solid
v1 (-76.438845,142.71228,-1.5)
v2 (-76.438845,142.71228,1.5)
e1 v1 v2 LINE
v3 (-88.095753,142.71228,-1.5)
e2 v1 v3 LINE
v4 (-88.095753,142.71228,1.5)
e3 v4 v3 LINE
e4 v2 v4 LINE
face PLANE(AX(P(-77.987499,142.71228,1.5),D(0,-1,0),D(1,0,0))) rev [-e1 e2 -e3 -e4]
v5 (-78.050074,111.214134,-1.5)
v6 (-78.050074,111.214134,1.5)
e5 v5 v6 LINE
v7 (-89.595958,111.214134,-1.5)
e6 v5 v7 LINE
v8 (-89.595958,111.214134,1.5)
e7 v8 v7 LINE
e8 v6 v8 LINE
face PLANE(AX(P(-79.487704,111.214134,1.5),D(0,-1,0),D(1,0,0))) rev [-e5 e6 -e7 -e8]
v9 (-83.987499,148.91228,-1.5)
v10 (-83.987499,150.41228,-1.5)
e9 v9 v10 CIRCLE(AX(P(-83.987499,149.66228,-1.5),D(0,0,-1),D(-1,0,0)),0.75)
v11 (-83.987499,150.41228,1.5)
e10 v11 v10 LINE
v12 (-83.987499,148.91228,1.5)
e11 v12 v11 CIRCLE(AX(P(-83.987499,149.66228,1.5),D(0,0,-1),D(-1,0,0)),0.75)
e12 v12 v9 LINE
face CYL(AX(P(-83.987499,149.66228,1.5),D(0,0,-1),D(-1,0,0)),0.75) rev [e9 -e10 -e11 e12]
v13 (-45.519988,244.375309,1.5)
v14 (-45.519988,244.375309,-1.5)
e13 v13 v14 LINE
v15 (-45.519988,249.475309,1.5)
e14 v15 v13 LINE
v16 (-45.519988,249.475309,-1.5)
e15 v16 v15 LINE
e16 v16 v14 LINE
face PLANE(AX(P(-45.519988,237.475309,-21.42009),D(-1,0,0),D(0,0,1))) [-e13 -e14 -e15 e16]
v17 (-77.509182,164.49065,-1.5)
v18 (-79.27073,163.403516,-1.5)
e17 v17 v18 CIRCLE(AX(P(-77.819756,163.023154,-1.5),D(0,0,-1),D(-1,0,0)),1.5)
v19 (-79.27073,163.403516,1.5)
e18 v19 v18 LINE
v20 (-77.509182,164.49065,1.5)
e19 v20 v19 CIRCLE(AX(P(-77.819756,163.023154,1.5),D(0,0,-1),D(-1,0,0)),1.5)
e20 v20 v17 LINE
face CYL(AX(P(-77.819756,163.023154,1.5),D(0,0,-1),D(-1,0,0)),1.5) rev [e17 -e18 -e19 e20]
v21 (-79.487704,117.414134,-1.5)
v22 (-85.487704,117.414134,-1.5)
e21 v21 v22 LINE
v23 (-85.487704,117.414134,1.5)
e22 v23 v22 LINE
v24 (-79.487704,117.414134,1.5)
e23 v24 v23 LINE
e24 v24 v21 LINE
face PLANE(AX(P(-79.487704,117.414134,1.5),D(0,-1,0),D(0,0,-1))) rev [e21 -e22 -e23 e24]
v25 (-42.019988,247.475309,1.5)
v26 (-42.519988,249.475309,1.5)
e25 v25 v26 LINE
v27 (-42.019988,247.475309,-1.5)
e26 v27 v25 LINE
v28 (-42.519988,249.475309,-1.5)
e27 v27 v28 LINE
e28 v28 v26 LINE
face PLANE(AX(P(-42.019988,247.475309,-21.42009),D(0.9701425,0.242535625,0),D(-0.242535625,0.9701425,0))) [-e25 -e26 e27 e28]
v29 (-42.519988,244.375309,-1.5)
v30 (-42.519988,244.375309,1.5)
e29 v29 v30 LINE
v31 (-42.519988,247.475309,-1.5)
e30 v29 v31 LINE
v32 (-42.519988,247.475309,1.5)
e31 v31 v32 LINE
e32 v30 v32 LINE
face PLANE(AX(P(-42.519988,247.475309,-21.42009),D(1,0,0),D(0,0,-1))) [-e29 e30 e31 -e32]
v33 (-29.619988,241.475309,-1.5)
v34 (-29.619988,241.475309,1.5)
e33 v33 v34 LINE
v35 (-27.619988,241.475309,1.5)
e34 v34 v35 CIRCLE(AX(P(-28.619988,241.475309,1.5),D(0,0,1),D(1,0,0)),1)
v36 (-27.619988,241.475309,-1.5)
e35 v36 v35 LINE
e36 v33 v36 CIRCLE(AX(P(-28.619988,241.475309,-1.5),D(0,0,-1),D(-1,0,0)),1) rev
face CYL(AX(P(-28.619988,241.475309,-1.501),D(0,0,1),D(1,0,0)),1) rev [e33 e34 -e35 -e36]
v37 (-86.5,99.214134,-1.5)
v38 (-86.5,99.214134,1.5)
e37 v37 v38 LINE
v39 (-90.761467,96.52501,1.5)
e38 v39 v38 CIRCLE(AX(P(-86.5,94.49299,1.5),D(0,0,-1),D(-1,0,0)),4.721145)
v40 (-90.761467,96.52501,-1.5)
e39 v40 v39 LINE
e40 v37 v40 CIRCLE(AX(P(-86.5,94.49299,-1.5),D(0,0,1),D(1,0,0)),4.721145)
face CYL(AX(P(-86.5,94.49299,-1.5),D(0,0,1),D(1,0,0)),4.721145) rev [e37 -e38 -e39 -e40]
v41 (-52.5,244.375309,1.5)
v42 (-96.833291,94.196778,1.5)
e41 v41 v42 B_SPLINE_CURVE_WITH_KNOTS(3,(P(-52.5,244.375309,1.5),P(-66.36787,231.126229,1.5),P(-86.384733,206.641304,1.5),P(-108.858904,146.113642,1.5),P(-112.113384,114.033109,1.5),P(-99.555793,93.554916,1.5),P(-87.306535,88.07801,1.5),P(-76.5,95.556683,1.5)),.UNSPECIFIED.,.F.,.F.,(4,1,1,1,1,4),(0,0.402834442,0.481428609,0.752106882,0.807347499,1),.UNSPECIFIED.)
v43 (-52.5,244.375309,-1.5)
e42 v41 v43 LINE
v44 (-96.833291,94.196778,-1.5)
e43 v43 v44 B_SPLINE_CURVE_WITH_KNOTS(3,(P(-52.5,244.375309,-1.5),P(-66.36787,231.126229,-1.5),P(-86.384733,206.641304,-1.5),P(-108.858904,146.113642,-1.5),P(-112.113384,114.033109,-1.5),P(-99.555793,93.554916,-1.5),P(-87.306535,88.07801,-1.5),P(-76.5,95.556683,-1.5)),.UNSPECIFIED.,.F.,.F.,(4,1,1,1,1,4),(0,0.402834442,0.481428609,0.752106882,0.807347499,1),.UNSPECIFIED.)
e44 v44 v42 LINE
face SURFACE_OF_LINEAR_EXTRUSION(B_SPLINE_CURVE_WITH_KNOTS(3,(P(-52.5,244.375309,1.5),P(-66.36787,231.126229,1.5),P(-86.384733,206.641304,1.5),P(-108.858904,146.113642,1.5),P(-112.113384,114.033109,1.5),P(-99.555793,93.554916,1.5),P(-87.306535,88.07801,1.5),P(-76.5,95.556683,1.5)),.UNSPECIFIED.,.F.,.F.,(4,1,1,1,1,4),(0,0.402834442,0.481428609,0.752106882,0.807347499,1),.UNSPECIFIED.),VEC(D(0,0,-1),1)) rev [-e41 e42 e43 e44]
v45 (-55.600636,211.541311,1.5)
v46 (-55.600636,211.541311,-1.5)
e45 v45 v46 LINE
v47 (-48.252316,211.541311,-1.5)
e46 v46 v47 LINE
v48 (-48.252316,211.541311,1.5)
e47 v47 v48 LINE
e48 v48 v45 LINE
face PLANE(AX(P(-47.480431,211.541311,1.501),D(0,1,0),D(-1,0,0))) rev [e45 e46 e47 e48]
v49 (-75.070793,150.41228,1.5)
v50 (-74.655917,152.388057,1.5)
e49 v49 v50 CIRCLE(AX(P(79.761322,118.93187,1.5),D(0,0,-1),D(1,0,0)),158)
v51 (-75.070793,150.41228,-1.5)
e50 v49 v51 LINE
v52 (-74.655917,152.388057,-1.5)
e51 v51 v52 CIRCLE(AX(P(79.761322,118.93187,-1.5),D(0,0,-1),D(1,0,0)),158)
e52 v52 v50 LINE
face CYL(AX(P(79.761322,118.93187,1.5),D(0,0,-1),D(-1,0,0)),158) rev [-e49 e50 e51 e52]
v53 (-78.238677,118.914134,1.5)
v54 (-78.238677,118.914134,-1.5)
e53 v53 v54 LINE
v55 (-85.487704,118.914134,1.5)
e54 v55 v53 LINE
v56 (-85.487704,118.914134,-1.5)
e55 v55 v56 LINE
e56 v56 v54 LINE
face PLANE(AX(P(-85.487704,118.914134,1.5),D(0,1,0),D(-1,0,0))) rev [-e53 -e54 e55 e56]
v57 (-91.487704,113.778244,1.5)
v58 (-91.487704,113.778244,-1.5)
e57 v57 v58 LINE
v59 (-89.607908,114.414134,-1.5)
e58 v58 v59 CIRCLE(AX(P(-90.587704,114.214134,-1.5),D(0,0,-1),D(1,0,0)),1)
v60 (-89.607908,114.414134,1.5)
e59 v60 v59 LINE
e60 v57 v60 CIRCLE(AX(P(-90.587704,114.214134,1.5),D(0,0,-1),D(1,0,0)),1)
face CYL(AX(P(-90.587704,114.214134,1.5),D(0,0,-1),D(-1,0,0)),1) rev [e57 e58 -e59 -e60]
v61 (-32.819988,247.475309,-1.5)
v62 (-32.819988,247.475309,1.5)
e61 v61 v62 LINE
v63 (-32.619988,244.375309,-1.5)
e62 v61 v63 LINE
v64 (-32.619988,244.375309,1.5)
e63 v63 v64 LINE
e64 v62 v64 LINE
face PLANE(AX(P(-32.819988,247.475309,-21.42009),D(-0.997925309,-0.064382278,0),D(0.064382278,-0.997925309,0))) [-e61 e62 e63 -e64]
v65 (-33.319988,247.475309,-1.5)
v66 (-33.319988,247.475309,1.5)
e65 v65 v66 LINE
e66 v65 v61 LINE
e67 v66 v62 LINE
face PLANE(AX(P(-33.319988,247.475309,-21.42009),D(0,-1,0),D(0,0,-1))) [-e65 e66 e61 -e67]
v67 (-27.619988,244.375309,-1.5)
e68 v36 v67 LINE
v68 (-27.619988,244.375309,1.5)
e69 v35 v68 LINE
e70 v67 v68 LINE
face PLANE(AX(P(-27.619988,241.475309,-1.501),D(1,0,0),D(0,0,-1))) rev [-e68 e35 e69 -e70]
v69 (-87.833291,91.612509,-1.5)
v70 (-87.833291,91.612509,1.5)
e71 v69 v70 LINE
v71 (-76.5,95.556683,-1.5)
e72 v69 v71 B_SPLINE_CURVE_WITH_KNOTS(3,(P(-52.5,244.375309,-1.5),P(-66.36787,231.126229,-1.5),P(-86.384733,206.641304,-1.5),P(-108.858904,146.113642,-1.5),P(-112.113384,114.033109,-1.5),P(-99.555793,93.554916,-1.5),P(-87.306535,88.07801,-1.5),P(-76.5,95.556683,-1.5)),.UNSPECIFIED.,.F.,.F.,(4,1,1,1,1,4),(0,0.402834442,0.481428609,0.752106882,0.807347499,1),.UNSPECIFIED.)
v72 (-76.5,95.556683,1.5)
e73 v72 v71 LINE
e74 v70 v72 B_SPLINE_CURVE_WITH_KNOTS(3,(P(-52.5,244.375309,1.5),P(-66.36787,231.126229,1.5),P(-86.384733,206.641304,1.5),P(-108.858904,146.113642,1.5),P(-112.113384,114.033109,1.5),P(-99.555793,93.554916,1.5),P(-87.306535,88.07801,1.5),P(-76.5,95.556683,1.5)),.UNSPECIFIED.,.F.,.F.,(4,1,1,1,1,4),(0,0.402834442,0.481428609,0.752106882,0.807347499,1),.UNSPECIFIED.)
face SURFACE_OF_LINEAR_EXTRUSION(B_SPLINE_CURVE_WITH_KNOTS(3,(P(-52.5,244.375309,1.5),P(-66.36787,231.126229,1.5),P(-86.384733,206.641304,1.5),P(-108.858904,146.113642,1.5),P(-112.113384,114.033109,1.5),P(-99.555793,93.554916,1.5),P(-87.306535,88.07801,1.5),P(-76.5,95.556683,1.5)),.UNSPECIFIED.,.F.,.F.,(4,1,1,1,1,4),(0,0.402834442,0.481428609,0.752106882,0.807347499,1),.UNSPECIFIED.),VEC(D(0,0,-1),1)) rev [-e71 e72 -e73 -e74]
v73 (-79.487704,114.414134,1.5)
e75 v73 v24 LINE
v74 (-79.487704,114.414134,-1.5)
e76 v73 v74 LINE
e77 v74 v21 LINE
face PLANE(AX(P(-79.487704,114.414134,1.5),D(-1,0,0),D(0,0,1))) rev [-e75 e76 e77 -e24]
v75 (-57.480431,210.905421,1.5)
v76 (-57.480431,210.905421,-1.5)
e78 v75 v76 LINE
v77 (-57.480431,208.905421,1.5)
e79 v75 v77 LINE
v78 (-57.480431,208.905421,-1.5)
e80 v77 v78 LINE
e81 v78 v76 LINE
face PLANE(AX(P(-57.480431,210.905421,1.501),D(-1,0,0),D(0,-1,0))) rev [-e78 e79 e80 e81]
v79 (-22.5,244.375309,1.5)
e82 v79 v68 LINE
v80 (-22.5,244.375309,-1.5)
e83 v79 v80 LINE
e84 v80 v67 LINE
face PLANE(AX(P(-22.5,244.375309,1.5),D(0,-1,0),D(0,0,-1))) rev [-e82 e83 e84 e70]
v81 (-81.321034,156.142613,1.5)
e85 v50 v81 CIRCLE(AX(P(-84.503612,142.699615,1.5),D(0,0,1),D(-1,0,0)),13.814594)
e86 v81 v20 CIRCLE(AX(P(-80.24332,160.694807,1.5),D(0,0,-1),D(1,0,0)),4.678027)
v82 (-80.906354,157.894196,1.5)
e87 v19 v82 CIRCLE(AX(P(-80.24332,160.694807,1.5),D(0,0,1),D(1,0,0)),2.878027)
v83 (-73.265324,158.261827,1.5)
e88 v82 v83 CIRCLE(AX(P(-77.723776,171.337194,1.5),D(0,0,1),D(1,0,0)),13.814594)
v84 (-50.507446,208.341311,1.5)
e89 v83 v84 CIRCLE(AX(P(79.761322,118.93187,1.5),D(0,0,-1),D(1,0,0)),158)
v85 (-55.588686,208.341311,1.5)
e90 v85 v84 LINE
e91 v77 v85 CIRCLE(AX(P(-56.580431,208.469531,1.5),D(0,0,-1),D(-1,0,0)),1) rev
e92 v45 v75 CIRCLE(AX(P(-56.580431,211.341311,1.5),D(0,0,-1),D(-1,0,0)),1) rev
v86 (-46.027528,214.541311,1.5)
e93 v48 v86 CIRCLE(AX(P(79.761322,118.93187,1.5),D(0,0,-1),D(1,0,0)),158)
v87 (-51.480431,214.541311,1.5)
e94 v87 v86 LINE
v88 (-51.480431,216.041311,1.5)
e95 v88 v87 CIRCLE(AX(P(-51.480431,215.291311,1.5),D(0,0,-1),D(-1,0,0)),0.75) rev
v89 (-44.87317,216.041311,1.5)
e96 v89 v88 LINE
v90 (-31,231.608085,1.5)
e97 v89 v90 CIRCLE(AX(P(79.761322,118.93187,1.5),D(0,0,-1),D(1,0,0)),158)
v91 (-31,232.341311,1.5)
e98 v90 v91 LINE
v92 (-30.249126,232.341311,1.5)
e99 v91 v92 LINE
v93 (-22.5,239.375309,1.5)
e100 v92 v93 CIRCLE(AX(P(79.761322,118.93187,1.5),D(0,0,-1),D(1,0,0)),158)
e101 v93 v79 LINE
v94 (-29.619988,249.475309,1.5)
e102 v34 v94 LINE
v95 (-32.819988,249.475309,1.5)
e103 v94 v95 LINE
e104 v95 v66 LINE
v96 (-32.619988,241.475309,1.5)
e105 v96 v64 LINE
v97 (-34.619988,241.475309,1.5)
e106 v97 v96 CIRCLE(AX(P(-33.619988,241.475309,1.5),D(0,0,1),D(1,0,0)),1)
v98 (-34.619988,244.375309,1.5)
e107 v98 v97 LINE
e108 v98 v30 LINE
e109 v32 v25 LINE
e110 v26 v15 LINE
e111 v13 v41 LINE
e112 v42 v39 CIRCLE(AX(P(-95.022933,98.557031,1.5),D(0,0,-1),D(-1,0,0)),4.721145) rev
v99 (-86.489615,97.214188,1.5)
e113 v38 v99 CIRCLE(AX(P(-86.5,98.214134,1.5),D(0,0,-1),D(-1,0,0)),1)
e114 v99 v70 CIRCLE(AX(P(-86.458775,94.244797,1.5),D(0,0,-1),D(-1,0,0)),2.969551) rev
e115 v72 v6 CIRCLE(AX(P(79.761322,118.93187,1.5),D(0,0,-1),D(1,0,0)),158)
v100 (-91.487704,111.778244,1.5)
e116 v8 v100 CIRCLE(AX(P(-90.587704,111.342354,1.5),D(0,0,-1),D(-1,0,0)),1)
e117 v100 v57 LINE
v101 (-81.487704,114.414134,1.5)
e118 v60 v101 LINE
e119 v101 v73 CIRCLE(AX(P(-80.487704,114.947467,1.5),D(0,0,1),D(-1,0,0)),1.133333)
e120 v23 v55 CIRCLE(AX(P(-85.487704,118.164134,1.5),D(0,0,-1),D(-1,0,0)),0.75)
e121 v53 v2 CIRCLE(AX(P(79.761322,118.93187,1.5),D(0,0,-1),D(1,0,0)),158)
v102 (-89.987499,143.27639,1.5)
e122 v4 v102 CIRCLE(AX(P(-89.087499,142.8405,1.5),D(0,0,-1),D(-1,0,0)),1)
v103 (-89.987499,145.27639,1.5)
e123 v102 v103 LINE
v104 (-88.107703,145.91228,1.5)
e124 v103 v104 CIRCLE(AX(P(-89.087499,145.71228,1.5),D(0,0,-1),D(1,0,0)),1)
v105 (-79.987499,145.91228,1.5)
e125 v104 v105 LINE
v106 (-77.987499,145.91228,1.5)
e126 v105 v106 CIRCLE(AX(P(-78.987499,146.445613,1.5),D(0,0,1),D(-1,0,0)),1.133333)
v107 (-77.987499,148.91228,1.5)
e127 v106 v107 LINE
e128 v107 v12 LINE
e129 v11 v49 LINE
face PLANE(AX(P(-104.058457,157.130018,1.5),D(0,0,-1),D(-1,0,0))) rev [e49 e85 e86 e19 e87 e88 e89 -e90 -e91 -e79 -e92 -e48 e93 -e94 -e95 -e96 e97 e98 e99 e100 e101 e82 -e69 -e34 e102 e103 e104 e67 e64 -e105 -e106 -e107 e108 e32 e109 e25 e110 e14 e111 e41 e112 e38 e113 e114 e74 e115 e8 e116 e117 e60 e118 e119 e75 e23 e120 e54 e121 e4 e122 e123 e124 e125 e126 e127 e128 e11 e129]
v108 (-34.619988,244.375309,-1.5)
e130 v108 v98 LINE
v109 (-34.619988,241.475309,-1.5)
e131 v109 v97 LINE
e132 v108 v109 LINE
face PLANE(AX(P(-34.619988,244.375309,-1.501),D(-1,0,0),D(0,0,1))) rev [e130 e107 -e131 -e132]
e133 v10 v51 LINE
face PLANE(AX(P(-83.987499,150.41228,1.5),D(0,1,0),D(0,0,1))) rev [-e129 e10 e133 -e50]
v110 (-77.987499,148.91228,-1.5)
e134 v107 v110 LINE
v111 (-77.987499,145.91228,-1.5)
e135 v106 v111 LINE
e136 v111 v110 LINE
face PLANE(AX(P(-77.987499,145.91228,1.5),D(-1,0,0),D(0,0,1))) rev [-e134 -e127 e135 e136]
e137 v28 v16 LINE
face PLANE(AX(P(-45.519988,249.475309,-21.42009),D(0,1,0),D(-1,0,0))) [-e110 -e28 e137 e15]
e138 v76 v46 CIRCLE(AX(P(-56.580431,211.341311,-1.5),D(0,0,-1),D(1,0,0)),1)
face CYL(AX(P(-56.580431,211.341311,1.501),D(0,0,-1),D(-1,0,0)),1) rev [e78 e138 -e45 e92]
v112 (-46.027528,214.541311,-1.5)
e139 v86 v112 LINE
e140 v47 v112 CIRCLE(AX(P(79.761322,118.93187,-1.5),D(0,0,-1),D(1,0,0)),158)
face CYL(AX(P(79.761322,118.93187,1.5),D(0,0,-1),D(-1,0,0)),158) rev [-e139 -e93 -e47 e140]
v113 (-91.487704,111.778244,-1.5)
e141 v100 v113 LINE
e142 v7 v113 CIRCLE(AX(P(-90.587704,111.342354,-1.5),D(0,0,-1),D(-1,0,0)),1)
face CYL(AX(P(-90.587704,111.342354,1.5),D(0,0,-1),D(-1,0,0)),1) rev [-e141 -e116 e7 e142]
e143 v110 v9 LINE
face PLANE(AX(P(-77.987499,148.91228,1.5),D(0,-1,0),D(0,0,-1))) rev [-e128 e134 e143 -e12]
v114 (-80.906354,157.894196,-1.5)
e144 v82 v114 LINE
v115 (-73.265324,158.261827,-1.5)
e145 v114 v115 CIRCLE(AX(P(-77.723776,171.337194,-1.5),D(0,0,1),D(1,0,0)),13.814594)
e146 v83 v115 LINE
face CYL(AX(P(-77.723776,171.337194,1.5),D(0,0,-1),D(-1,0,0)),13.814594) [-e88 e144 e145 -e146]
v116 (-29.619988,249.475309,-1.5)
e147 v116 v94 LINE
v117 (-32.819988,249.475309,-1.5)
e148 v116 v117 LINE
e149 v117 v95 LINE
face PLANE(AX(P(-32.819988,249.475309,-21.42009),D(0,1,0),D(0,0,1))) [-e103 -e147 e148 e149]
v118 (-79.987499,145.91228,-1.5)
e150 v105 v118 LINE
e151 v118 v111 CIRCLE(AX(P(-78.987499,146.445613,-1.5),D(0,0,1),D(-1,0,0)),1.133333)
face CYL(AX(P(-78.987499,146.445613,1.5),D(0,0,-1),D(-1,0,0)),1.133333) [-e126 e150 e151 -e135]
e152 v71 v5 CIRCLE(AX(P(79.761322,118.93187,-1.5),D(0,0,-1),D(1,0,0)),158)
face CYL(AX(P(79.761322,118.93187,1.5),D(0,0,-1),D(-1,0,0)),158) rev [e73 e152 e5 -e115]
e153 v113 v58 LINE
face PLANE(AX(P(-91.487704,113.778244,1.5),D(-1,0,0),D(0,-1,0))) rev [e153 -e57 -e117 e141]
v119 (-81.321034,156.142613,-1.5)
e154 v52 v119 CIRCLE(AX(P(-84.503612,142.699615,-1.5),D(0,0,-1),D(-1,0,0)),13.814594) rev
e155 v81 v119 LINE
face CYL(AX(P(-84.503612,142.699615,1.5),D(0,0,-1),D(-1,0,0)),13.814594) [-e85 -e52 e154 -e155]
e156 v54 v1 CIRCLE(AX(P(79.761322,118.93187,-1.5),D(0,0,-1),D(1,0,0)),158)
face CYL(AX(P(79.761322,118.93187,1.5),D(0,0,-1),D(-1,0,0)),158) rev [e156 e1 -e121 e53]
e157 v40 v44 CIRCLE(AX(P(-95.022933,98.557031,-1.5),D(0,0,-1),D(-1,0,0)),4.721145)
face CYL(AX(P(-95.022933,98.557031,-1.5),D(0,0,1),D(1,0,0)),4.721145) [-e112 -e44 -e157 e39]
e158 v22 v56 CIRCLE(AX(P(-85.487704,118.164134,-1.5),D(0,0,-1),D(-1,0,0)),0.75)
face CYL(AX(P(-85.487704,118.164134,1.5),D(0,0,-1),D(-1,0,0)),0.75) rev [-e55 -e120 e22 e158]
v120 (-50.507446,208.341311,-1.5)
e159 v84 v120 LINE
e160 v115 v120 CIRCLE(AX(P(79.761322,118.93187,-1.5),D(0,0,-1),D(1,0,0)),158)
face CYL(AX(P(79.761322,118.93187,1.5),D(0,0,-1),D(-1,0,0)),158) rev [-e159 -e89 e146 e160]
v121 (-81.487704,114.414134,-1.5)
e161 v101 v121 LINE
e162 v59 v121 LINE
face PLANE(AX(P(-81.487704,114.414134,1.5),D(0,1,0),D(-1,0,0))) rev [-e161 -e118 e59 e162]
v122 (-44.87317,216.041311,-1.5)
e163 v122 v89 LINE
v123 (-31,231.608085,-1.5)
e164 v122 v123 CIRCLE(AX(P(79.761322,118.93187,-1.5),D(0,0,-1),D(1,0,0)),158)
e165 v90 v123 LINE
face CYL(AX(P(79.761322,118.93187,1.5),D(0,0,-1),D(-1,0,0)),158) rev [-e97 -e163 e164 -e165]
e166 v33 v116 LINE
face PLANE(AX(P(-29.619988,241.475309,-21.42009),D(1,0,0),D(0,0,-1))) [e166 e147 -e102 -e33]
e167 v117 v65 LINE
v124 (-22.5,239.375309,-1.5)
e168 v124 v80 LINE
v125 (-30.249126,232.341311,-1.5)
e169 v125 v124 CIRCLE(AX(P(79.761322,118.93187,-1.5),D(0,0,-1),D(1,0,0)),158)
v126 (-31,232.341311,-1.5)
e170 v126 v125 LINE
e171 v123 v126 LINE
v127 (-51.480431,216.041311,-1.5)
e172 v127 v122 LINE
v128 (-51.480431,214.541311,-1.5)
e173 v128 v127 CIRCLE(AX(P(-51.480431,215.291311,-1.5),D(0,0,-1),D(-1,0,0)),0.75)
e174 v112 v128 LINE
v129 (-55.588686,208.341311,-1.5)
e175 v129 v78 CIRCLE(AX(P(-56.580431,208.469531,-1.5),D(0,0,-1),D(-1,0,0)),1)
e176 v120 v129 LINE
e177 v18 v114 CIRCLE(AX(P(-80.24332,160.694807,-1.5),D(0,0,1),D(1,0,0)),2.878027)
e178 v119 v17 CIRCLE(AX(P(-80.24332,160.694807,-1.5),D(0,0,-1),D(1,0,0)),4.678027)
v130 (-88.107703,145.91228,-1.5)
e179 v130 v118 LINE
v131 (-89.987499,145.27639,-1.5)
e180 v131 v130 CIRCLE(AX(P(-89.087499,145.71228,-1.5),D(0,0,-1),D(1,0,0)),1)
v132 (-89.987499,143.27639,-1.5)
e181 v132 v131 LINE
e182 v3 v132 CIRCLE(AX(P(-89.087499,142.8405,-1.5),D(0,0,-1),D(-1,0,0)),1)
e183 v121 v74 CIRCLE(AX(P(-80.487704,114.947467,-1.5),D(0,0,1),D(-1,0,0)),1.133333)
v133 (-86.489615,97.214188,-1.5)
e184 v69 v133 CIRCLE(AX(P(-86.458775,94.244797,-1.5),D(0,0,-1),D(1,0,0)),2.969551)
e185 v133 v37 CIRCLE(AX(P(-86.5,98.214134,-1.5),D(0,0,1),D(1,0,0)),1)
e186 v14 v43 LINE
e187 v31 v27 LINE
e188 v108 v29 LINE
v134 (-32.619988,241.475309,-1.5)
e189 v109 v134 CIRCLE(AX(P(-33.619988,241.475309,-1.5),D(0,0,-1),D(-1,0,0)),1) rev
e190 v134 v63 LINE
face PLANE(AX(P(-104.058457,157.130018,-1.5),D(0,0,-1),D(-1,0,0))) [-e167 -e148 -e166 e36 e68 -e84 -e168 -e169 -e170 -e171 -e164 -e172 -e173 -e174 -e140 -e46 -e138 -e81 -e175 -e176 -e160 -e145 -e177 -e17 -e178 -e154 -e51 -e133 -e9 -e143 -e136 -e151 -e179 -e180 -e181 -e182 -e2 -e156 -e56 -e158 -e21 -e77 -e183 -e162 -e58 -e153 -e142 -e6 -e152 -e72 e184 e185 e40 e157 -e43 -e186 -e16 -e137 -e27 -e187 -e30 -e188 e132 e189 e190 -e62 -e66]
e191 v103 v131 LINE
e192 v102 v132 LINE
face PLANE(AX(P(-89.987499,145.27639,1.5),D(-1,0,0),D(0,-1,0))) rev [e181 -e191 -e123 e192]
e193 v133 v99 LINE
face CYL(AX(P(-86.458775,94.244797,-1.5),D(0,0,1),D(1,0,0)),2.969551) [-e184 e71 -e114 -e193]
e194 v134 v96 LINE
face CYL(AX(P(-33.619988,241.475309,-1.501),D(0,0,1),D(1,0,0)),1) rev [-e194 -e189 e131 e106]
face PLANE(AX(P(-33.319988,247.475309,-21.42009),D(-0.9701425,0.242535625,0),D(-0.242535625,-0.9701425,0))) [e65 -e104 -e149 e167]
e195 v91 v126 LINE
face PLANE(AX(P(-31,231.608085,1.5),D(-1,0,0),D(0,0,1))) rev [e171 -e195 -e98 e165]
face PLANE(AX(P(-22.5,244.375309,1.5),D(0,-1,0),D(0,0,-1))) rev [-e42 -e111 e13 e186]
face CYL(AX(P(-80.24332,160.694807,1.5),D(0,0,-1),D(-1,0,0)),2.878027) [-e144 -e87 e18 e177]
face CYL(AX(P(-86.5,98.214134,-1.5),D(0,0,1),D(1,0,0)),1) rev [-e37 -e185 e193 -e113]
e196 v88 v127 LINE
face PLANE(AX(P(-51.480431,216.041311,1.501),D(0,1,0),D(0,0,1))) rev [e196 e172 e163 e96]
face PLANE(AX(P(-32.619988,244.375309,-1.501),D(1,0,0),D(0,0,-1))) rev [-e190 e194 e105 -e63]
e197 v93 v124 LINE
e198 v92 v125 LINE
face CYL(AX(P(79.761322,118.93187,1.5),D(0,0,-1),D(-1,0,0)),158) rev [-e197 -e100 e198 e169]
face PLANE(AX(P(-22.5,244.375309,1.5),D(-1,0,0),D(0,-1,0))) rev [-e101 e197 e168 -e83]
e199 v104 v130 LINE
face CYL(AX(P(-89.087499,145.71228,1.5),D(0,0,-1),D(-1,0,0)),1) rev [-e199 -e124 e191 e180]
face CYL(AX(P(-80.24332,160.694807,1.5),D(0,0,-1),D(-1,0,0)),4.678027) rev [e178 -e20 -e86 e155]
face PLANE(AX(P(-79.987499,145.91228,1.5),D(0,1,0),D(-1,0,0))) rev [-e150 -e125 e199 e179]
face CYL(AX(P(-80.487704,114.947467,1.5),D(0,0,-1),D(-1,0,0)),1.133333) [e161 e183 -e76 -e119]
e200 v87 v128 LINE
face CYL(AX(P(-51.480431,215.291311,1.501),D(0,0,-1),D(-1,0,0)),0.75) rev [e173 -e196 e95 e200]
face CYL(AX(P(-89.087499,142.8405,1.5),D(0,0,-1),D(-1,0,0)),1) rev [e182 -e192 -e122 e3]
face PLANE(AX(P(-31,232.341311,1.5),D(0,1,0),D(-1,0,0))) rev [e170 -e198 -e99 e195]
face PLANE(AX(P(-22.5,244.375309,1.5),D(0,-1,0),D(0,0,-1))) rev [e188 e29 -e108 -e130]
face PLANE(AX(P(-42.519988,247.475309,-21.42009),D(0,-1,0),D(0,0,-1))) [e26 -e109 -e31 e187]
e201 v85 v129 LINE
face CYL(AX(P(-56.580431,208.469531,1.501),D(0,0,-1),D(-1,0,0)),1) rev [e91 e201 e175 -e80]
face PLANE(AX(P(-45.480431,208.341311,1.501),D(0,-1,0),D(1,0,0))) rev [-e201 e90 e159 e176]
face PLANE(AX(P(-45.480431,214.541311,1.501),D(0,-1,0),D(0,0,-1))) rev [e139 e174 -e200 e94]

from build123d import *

# Parameters (mm, degrees)
BOSS_EXTRUDE1_DEPTH          = 1.5
BOSS_EXTRUDE1_DEPTH_BACK     = 1.5
PLATE1_SLOT_DEPTH            = 268.75601623
PLATE2_SLOT_DEPTH            = 268.75601623
PLATE3_SLOT_START            = -3
PLATE3_SLOT_DEPTH            = 3
UPPER_START                  = -1.5
UPPER_BAND_HOOK_DEPTH        = 3
LOWER_BAND_HOOK_DEPTH        = 268.75601623
TOP_PLATE_TEETH_DEPTH        = 3
TOP_PLATE_TEETH_RELIEF_REACH = 274.419
SERVO_CLEARANCE_DEPTH        = 273.418652776


# Read off the part's stored shape, not the designer's step: upper band hook
with BuildPart() as part:
    # Sketch1 → Boss-Extrude1 (new, two sides: drawn at the far end of the back side and taken through both)
    with BuildSketch(Plane.XY.offset(-BOSS_EXTRUDE1_DEPTH_BACK)):
        with BuildLine():
            Line((-22.5, 244.375309013), (-52.5, 244.375309013))
            add(Edge.make_bspline(
                [(-52.5, 244.375309013), (-66.367869978, 231.126229196), (-86.384732952, 206.641303547), (-108.858903818, 146.113641656), (-112.113384109, 114.033108561), (-99.555792699, 93.554916207), (-87.306535283, 88.078010017), (-76.5, 95.556683179)],
                knots=[0, 0, 0, 0, 0.402834442, 0.481428609, 0.752106882, 0.807347499, 1, 1, 1, 1], degree=3))
            ThreePointArc((-76.5, 95.556683179), (-68.155677229, 174.470697778), (-22.5, 239.375309013))
            Line((-22.5, 239.375309013), (-22.5, 244.375309013))
        make_face()
    extrude(amount=BOSS_EXTRUDE1_DEPTH + BOSS_EXTRUDE1_DEPTH_BACK)

    # Sketch2 → plate1-slot (cut, through all)
    with BuildSketch(Plane(origin=(0, 0, -1.5), x_dir=(-1, 0, 0), z_dir=(0, 0, -1))):
        with BuildLine():
            Line((79.487704092, 114.414134112), (79.487704092, 117.414134112))
            Line((79.487704092, 117.414134112), (85.487704092, 117.414134112))
            ThreePointArc((85.487704092, 117.414134112), (86.237704092, 118.164134112), (85.487704092, 118.914134112))
            Line((85.487704092, 118.914134112), (64.487704092, 118.914134112))
            Line((64.487704092, 118.914134112), (64.487704092, 111.214134112))
            Line((64.487704092, 111.214134112), (79.487704092, 111.214134112))
            Line((79.487704092, 111.214134112), (89.59595837, 111.214134112))
            ThreePointArc((89.59595837, 111.214134112), (90.873465132, 110.384053417), (91.487704092, 111.778244218))
            Line((91.487704092, 111.778244218), (91.487704092, 113.778244218))
            ThreePointArc((91.487704092, 113.778244218), (90.908142597, 115.161403432), (89.607908195, 114.414134112))
            Line((89.607908195, 114.414134112), (81.487704092, 114.414134112))
            ThreePointArc((81.487704092, 114.414134112), (80.487704092, 113.814134112), (79.487704092, 114.414134112))
        make_face()
    extrude(amount=-PLATE1_SLOT_DEPTH, mode=Mode.SUBTRACT)

    # Sketch3 → plate2-slot (cut, through all)
    with BuildSketch(Plane(origin=(0, 0, -1.5), x_dir=(-1, 0, 0), z_dir=(0, 0, -1))):
        with BuildLine():
            Line((77.987499132, 145.912279649), (77.987499132, 148.912279649))
            Line((77.987499132, 148.912279649), (83.987499132, 148.912279649))
            ThreePointArc((83.987499132, 148.912279649), (84.737499132, 149.662279649), (83.987499132, 150.412279649))
            Line((83.987499132, 150.412279649), (62.987499132, 150.412279649))
            Line((62.987499132, 150.412279649), (62.987499132, 142.712279649))
            Line((62.987499132, 142.712279649), (77.987499132, 142.712279649))
            Line((77.987499132, 142.712279649), (88.09575341, 142.712279649))
            ThreePointArc((88.09575341, 142.712279649), (89.373260172, 141.882198954), (89.987499132, 143.276389755))
            Line((89.987499132, 143.276389755), (89.987499132, 145.276389755))
            ThreePointArc((89.987499132, 145.276389755), (89.407937637, 146.659548969), (88.107703235, 145.912279649))
            Line((88.107703235, 145.912279649), (79.987499132, 145.912279649))
            ThreePointArc((79.987499132, 145.912279649), (78.987499132, 145.312279649), (77.987499132, 145.912279649))
        make_face()
    extrude(amount=-PLATE2_SLOT_DEPTH, mode=Mode.SUBTRACT)

    # Sketch4 → plate3-slot (cut)
    with BuildSketch(Plane(origin=(0, 0, -1.5), x_dir=(-1, 0, 0), z_dir=(0, 0, -1)).offset(PLATE3_SLOT_START)):
        with BuildLine():
            Line((45.480431453, 211.541310922), (45.480431453, 214.541310922))
            Line((45.480431453, 214.541310922), (51.480431453, 214.541310922))
            ThreePointArc((51.480431453, 214.541310922), (52.230431453, 215.291310922), (51.480431453, 216.041310922))
            Line((51.480431453, 216.041310922), (30.480431453, 216.041310922))
            Line((30.480431453, 216.041310922), (30.480431453, 208.341310922))
            Line((30.480431453, 208.341310922), (45.480431453, 208.341310922))
            Line((45.480431453, 208.341310922), (55.588685731, 208.341310922))
            ThreePointArc((55.588685731, 208.341310922), (56.866192493, 207.511230226), (57.480431453, 208.905421027))
            Line((57.480431453, 208.905421027), (57.480431453, 210.905421027))
            ThreePointArc((57.480431453, 210.905421027), (56.900869958, 212.288580241), (55.600635556, 211.541310922))
            Line((55.600635556, 211.541310922), (47.480431453, 211.541310922))
            ThreePointArc((47.480431453, 211.541310922), (46.480431453, 210.941310922), (45.480431453, 211.541310922))
        make_face()
    extrude(amount=PLATE3_SLOT_DEPTH, mode=Mode.SUBTRACT)

    # upper band hook outline → upper band hook (cut)
    with BuildSketch(Plane.XY.offset(UPPER_START)):
        with BuildLine():
            ThreePointArc((-77.509182055, 164.490649705), (-84.498712373, 162.637889725), (-81.321034284, 156.14261332))
            ThreePointArc((-81.321034284, 156.14261332), (-77.723407217, 154.73588636), (-74.655916798, 152.38805677))
            ThreePointArc((-74.655916798, 152.38805677), (-73.988672918, 155.331583344), (-73.265324436, 158.261827372))
            ThreePointArc((-73.265324436, 158.261827372), (-77.059884741, 157.538561622), (-80.906354002, 157.894195537))
            ThreePointArc((-80.906354002, 157.894195537), (-83.002325348, 161.513908871), (-79.270729863, 163.403516141))
            ThreePointArc((-79.270729863, 163.403516141), (-77.031979162, 161.746671557), (-77.509182055, 164.490649705))
        make_face()
    extrude(amount=UPPER_BAND_HOOK_DEPTH, mode=Mode.SUBTRACT)

    # Sketch7 → lower band hook (cut, through all)
    with BuildSketch(Plane(origin=(0, 0, -1.5), x_dir=(-1, 0, 0), z_dir=(0, 0, -1))):
        with BuildLine():
            Line((-218.104253523, -68.140600113), (87.833291208, 91.612508945))
            ThreePointArc((87.833291208, 91.612508945), (89.346413744, 94.937455747), (86.489614642, 97.214188042))
            ThreePointArc((86.489614642, 97.214188042), (85.500013482, 98.219326861), (86.5, 99.214134112))
            ThreePointArc((86.5, 99.214134112), (89.019498135, 98.485649701), (90.761466541, 96.525010402))
            ThreePointArc((90.761466541, 96.525010402), (93.332622526, 94.148850656), (96.833291208, 94.196777889))
            Line((96.833291208, 94.196777889), (415.586561712, 226.541742558))
            Line((415.586561712, 226.541742558), (706.648712408, -399.364139305))
            Line((706.648712408, -399.364139305), (72.957897174, -694.046481976))
            Line((72.957897174, -694.046481976), (-218.104253523, -68.140600113))
        make_face()
    extrude(amount=-LOWER_BAND_HOOK_DEPTH, mode=Mode.SUBTRACT)

    # Sketch15 → top-plate-teeth (add)
    with BuildSketch(Plane.XY.offset(1.5)):
        with BuildLine():
            Line((-42.51998799, 247.475309013), (-42.51998799, 244.375309013))
            Line((-42.51998799, 244.375309013), (-34.61998799, 244.375309013))
            Line((-34.61998799, 244.375309013), (-34.61998799, 241.475309013))
            ThreePointArc((-34.61998799, 241.475309013), (-33.61998799, 240.475309013), (-32.61998799, 241.475309013))
            Line((-32.61998799, 241.475309013), (-32.61998799, 244.375309013))
            Line((-32.61998799, 244.375309013), (-32.81998799, 247.475309013))
            Line((-32.81998799, 247.475309013), (-33.31998799, 247.475309013))
            Line((-33.31998799, 247.475309013), (-32.81998799, 249.475309013))
            Line((-32.81998799, 249.475309013), (-29.61998799, 249.475309013))
            Line((-29.61998799, 249.475309013), (-29.61998799, 241.475309013))
            Line((-29.61998799, 241.475309013), (-29.61998799, 237.475309013))
            Line((-29.61998799, 237.475309013), (-45.51998799, 237.475309013))
            Line((-45.51998799, 237.475309013), (-45.51998799, 249.475309013))
            Line((-45.51998799, 249.475309013), (-42.51998799, 249.475309013))
            Line((-42.51998799, 249.475309013), (-42.01998799, 247.475309013))
            Line((-42.01998799, 247.475309013), (-42.51998799, 247.475309013))
        make_face()
    extrude(amount=-TOP_PLATE_TEETH_DEPTH)

    # Sketch17 → top-plate-teeth-relief (cut, up to next)
    with BuildSketch(Plane.XY.offset(1.5), mode=Mode.PRIVATE) as top_plate_teeth_relief_sk1:
        with BuildLine():
            Line((-34.61998799, 244.375309013), (-32.61998799, 244.375309013))
            Line((-32.61998799, 244.375309013), (-32.61998799, 241.475309013))
            ThreePointArc((-32.61998799, 241.475309013), (-33.61998799, 240.475309013), (-34.61998799, 241.475309013))
            Line((-34.61998799, 241.475309013), (-34.61998799, 244.375309013))
        make_face()
    top_plate_teeth_relief_tool1 = extrude(top_plate_teeth_relief_sk1.sketch, amount=-TOP_PLATE_TEETH_RELIEF_REACH, mode=Mode.PRIVATE) & part.part
    # Sketch17 → top-plate-teeth-relief (cut, up to next)
    with BuildSketch(Plane.XY.offset(1.5), mode=Mode.PRIVATE) as top_plate_teeth_relief_sk2:
        with BuildLine():
            Line((-29.61998799, 244.375309013), (-29.61998799, 241.475309013))
            ThreePointArc((-29.61998799, 241.475309013), (-28.61998799, 240.475309013), (-27.61998799, 241.475309013))
            Line((-27.61998799, 241.475309013), (-27.61998799, 244.375309013))
            Line((-27.61998799, 244.375309013), (-29.61998799, 244.375309013))
        make_face()
    top_plate_teeth_relief_tool2 = extrude(top_plate_teeth_relief_sk2.sketch, amount=-TOP_PLATE_TEETH_RELIEF_REACH, mode=Mode.PRIVATE) & part.part
    add(top_plate_teeth_relief_tool1.solids().sort_by_distance((-33.619988, 242.525851, 1.5))[0], mode=Mode.SUBTRACT)
    add(top_plate_teeth_relief_tool2.solids().sort_by_distance((-28.619988, 242.525851, 1.5))[0], mode=Mode.SUBTRACT)

    # Sketch10 → servo clearance (cut, through all)
    with BuildSketch(Plane.XY.offset(1.5)):
        Polygon((-31, -101.29759897), (-31, 231.608085493), (-31, 232.341310922), (-30.249126131, 232.341310922), (302.656558332, 232.341310922), (773.443840549, -238.47087445), (439.787282217, -572.109784342), align=None)
    extrude(amount=-SERVO_CLEARANCE_DEPTH, mode=Mode.SUBTRACT)


solid = part.part
